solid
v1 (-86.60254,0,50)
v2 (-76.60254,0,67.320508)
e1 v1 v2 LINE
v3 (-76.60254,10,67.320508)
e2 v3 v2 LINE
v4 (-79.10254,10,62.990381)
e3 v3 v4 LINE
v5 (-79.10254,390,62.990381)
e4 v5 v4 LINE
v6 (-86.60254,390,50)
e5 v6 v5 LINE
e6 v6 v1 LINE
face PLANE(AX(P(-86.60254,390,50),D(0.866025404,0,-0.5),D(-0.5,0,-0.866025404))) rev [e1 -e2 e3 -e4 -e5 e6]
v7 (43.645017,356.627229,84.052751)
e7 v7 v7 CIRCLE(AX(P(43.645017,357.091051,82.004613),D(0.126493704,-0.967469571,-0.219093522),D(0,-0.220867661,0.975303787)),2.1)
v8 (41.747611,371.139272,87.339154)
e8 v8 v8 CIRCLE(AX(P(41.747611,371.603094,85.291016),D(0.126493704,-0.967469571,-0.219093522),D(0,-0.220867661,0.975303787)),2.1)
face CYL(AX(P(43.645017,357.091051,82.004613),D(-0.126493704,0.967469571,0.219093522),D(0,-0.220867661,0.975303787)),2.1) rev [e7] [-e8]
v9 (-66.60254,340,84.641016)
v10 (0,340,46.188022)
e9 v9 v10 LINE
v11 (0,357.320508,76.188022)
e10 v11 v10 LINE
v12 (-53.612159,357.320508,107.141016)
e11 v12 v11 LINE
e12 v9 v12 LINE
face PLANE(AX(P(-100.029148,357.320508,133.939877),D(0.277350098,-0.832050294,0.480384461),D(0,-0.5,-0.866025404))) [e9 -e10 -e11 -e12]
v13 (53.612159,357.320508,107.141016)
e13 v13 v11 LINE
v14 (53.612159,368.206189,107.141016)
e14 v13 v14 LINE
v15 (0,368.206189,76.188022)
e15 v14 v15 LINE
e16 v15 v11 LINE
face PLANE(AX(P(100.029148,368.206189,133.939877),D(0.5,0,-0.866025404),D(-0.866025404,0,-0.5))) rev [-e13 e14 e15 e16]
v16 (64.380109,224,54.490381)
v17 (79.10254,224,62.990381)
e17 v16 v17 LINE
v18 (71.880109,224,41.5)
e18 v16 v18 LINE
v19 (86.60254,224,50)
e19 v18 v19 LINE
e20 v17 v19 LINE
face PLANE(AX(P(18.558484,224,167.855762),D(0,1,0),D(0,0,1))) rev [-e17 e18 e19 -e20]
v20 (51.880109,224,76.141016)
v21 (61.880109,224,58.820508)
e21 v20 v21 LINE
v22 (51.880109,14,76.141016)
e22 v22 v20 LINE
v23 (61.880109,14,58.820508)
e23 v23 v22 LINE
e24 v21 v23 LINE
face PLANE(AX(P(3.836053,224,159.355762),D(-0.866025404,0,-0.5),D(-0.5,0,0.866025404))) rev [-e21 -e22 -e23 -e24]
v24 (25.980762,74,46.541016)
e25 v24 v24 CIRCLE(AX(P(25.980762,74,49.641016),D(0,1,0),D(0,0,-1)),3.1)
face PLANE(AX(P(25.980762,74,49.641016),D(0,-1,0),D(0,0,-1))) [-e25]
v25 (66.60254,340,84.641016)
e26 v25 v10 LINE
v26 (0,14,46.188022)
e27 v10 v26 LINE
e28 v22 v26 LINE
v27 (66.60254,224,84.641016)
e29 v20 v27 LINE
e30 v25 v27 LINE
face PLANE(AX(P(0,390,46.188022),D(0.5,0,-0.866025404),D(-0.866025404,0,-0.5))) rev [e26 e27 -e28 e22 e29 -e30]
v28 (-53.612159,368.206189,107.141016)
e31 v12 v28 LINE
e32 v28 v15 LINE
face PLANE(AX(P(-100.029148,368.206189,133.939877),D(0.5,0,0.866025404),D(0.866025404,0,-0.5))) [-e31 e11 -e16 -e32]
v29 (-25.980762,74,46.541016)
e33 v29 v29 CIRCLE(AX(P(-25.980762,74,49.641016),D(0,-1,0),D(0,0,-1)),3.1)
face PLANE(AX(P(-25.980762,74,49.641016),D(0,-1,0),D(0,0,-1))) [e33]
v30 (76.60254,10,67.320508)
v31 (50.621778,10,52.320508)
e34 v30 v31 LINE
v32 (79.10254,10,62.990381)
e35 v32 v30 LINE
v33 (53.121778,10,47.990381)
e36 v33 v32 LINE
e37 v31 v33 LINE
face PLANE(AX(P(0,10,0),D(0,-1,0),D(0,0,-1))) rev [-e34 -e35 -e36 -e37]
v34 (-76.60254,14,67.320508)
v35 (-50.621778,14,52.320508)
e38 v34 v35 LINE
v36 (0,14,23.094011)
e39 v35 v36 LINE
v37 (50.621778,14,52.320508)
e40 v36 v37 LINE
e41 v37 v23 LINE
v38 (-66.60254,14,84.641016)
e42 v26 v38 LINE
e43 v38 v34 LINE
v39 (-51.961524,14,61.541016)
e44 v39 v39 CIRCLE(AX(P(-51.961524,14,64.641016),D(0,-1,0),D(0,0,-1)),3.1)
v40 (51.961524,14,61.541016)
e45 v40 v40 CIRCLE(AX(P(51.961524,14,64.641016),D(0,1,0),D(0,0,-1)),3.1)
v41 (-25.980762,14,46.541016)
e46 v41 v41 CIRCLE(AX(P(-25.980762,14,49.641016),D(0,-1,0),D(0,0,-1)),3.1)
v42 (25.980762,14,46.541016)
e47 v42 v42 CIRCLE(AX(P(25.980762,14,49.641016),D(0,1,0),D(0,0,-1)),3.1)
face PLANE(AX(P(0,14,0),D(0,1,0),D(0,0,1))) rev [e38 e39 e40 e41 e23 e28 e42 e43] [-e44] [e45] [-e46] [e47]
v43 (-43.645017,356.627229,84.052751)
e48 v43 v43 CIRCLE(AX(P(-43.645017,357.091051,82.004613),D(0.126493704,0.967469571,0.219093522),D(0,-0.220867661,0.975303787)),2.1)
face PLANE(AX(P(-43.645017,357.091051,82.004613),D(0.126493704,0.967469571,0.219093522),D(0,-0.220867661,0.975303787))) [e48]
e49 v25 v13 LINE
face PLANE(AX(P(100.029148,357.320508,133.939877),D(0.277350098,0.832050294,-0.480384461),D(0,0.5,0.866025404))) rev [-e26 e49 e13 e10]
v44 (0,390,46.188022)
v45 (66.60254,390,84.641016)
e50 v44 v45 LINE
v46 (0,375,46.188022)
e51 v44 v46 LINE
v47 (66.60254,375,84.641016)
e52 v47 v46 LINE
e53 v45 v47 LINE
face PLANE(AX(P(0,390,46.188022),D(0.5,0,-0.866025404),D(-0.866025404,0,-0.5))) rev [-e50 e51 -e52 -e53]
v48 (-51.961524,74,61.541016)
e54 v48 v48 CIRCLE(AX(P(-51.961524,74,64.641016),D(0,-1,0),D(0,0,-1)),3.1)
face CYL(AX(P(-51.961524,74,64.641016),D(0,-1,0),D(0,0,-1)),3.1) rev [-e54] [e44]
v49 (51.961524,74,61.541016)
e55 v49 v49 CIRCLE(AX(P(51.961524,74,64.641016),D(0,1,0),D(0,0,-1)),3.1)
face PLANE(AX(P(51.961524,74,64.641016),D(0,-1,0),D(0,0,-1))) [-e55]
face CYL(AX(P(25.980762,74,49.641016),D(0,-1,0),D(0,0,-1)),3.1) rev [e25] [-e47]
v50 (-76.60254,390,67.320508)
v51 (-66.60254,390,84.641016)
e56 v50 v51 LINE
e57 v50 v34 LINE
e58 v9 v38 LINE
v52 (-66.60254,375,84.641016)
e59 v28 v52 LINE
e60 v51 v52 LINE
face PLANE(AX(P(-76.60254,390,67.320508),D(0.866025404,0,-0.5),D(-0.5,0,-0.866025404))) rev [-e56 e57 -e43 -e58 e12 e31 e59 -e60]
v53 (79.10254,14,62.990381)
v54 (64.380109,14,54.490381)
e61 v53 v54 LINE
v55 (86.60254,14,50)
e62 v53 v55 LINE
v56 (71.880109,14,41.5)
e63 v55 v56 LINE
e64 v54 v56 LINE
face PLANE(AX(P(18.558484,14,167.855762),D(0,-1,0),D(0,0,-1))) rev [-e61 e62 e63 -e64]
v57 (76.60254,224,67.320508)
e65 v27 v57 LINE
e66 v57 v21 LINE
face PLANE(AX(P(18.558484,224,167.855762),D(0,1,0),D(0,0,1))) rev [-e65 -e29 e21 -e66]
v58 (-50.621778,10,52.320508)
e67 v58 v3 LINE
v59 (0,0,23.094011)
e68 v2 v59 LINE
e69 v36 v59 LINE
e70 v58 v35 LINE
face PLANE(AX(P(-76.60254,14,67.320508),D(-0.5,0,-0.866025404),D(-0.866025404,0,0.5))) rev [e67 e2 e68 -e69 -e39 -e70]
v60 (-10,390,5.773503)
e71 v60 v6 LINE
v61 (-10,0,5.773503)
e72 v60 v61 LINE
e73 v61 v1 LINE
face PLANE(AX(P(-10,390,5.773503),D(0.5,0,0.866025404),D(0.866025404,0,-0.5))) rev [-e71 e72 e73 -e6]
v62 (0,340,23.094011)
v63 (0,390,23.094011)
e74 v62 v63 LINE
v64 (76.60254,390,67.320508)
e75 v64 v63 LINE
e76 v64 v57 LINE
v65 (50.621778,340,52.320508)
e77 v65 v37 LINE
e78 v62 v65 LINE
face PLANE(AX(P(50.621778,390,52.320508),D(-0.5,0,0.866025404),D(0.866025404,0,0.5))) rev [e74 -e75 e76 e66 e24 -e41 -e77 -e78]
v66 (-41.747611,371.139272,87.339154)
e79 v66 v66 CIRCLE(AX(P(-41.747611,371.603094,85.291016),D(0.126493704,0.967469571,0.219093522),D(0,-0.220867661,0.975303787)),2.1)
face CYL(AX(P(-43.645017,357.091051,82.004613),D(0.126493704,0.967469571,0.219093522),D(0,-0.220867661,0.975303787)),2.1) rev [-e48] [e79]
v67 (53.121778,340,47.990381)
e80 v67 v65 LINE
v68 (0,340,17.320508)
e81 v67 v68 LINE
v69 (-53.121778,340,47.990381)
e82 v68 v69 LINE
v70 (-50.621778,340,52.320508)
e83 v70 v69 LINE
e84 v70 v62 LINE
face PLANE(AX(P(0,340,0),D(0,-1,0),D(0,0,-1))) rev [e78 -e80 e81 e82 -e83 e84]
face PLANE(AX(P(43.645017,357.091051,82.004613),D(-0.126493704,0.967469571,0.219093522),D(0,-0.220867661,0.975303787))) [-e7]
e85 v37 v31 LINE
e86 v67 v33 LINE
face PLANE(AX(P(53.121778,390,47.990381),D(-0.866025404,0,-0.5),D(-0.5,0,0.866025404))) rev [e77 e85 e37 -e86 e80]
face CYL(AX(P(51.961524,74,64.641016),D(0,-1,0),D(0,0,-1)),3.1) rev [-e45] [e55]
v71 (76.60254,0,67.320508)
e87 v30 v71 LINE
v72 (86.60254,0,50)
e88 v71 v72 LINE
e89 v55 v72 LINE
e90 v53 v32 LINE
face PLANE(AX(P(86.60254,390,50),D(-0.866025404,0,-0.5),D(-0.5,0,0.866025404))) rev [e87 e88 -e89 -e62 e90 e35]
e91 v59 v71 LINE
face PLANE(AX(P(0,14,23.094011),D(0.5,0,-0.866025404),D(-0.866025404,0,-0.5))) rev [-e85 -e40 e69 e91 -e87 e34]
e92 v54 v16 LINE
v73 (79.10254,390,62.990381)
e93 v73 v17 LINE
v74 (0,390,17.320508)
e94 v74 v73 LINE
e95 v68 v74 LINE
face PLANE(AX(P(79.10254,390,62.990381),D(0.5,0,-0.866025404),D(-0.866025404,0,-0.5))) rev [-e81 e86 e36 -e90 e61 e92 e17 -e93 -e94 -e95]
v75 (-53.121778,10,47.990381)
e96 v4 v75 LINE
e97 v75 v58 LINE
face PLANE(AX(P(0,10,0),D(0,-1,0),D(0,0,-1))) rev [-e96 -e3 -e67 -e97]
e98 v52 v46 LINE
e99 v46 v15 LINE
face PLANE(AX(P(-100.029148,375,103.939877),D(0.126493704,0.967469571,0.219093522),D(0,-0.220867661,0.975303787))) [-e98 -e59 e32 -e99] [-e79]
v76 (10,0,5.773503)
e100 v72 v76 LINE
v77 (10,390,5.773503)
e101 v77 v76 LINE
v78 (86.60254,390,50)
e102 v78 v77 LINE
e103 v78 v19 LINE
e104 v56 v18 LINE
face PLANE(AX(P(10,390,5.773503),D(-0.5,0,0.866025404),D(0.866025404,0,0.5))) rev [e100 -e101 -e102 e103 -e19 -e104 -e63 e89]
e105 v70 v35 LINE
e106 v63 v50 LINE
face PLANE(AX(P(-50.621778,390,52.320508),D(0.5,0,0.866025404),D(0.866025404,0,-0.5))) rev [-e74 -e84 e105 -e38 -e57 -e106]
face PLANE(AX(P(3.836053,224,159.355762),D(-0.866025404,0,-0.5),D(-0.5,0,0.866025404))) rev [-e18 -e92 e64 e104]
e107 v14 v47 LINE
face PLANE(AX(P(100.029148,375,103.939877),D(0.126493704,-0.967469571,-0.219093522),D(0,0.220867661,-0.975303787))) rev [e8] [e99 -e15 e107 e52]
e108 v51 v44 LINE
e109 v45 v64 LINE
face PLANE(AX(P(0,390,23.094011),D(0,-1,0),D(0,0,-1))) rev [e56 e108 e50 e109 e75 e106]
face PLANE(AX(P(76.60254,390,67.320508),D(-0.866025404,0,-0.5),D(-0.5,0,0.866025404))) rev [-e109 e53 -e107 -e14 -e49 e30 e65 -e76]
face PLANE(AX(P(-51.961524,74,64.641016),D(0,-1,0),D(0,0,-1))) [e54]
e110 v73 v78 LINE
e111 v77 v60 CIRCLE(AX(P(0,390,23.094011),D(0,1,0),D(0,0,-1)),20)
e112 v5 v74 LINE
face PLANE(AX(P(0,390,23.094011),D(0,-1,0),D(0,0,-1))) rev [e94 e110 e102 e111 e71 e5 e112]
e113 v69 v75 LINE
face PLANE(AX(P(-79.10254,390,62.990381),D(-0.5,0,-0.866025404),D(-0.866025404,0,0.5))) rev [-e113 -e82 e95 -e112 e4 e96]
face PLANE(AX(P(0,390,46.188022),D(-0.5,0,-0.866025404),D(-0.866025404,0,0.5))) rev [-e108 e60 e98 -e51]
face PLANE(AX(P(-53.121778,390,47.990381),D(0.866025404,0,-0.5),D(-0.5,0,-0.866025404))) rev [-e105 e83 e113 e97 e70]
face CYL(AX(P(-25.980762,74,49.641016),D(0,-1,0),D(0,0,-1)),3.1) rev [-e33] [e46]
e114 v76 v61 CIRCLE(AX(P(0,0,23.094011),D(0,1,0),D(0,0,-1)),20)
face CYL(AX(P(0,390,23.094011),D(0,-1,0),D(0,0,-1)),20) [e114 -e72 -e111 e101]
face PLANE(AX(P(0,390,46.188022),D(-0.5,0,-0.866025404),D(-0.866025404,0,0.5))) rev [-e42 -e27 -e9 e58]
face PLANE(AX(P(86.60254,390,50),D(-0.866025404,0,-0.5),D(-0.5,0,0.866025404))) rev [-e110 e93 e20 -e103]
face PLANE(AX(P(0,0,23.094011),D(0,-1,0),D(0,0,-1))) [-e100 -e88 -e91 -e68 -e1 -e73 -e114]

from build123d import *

# Parameters (mm, degrees)
BOSS_EXTRUDE1_DEPTH = 390
CUT_EXTRUDE2_DEPTH  = 14
CUT_EXTRUDE3_DEPTH  = 50
BOSS_EXTRUDE2_DEPTH = 10
BOSS_EXTRUDE3_REACH = 473.852
BOSS_EXTRUDE4_REACH = 479.913
SKETCH22_R          = 2.1
CUT_EXTRUDE4_DEPTH  = 15
SKETCH23_R          = 3.1
CUT_EXTRUDE5_DEPTH  = 60
SKETCH24_W          = 17
SKETCH24_H          = 210
CUT_EXTRUDE6_DEPTH  = 414.617211129


with BuildPart() as part:
    # Sketch1 → Boss-Extrude1 (new body)
    with BuildSketch(Plane(origin=(0, 0, 0), x_dir=(1, 0, 0), z_dir=(0, 1, 0))):
        with BuildLine():
            Line((-10, -5.773502692), (-86.602540378, -50))
            Line((-86.602540378, -50), (-79.102540378, -62.990381057))
            Line((-79.102540378, -62.990381057), (-53.121778265, -47.990381057))
            Line((-53.121778265, -47.990381057), (-50.621778265, -52.320508076))
            Line((-50.621778265, -52.320508076), (-76.602540378, -67.320508076))
            Line((-76.602540378, -67.320508076), (-66.602540378, -84.641016151))
            Line((-66.602540378, -84.641016151), (0, -46.188021535))
            Line((0, -46.188021535), (66.602540378, -84.641016151))
            Line((66.602540378, -84.641016151), (76.602540378, -67.320508076))
            Line((76.602540378, -67.320508076), (50.621778265, -52.320508076))
            Line((50.621778265, -52.320508076), (53.121778265, -47.990381057))
            Line((53.121778265, -47.990381057), (79.102540378, -62.990381057))
            Line((79.102540378, -62.990381057), (86.602540378, -50))
            Line((86.602540378, -50), (10, -5.773502692))
            ThreePointArc((10, -5.773502692), (0, -3.094010768), (-10, -5.773502692))
        make_face()
    extrude(amount=BOSS_EXTRUDE1_DEPTH)

    # Sketch18 → Cut-Extrude2 (cut)
    with BuildSketch(Plane.XZ):
        Polygon((-76.602540378, 67.320508076), (0, 23.094010768), (76.602540378, 67.320508076), (66.602540378, 84.641016151), (0, 46.188021535), (-66.602540378, 84.641016151), align=None)
    extrude(amount=-CUT_EXTRUDE2_DEPTH, mode=Mode.SUBTRACT)

    # Sketch19 → Cut-Extrude3 (cut)
    with BuildSketch(Plane(origin=(0, 390, 0), x_dir=(1, 0, 0), z_dir=(0, 1, 0))):
        Polygon((76.602540378, -67.320508076), (0, -23.094010768), (-76.602540378, -67.320508076), (-79.102540378, -62.990381057), (0, -17.320508076), (79.102540378, -62.990381057), align=None)
    extrude(amount=-CUT_EXTRUDE3_DEPTH, mode=Mode.SUBTRACT)

    # Sketch20 → Boss-Extrude2 (add)
    with BuildSketch(Plane.XZ):
        Polygon((76.602540378, 67.320508076), (50.621778265, 52.320508076), (53.121778265, 47.990381057), (79.102540378, 62.990381057), align=None)
        Polygon((-50.621778265, 52.320508076), (-76.602540378, 67.320508076), (-79.102540378, 62.990381057), (-53.121778265, 47.990381057), align=None)
    extrude(amount=-BOSS_EXTRUDE2_DEPTH)

    # Boss-Extrude3: up to this plane
    boss_extrude3_end = Plane(origin=(-86.602540378, 390, 50), z_dir=(0.8660254037844359, 0, -0.5000000000000048))
    # Sketch21 → Boss-Extrude3 (add, up to the surface)
    with BuildSketch(Plane(origin=(0, 0, 0), x_dir=(0, 0, -1), z_dir=(1, 0, 0)), mode=Mode.PRIVATE) as boss_extrude3_sk1:
        Polygon((-46.188021535, 375), (-76.188021535, 368.206188758), (-76.188021535, 357.320508076), (-46.188021535, 340), align=None)
    boss_extrude3_tool1 = split(extrude(boss_extrude3_sk1.sketch, amount=BOSS_EXTRUDE3_REACH, dir=(-0.866025403784, 0, 0.5), mode=Mode.PRIVATE), bisect_by=boss_extrude3_end, keep=Keep.BOTH, mode=Mode.PRIVATE)
    add(boss_extrude3_tool1.solids().sort_by_distance((0, 359.670666, 58.56037))[0])

    # Boss-Extrude4: up to this plane
    boss_extrude4_end = Plane(origin=(76.602540378, 390, 67.320508076), z_dir=(-0.8660254037844398, 0, -0.49999999999999795))
    # Sketch21<2> → Boss-Extrude4 (add, up to the surface)
    with BuildSketch(Plane(origin=(0, 0, 0), x_dir=(0, 0, -1), z_dir=(1, 0, 0)), mode=Mode.PRIVATE) as boss_extrude4_sk1:
        Polygon((-46.188021535, 375), (-76.188021535, 368.206188758), (-76.188021535, 357.320508076), (-46.188021535, 340), align=None)
    boss_extrude4_tool1 = split(extrude(boss_extrude4_sk1.sketch, amount=BOSS_EXTRUDE4_REACH, dir=(0.866025403784, 0, 0.5), mode=Mode.PRIVATE), bisect_by=boss_extrude4_end, keep=Keep.BOTH, mode=Mode.PRIVATE)
    add(boss_extrude4_tool1.solids().sort_by_distance((0, 359.670666, 58.56037))[0])

    # Sketch22 → Cut-Extrude4 (cut)
    with BuildSketch(Plane(origin=(47.172106066, 360.789319124, 81.704484407), x_dir=(0.9919674102096397, -0.12336978823439819, -0.027938368473838713), z_dir=(0.12649370372465277, 0.9674695714450555, 0.21909352168866236))):
        with Locations((-89.639756751, -1.109544744)):
            Circle(SKETCH22_R)
    cut_extrude4 = extrude(amount=-CUT_EXTRUDE4_DEPTH, mode=Mode.SUBTRACT)

    # Mirror1: Cut-Extrude4 across plane
    add(cut_extrude4.mirror(Plane(origin=(0, 0, 0), x_dir=(0, 0, 1), z_dir=(1, 0, 0))), mode=Mode.SUBTRACT)

    # Sketch23 → Cut-Extrude5 (cut)
    with BuildSketch(Plane.XZ.offset(-14)):
        with Locations((-25.980762114, 49.641016151)):
            Circle(SKETCH23_R)
        with Locations((-51.961524227, 64.641016151)):
            Circle(SKETCH23_R)
    cut_extrude5 = extrude(amount=-CUT_EXTRUDE5_DEPTH, mode=Mode.SUBTRACT)

    # Mirror2: Cut-Extrude5 across plane
    add(cut_extrude5.mirror(Plane(origin=(0, 0, 0), x_dir=(0, 0, 1), z_dir=(1, 0, 0))), mode=Mode.SUBTRACT)

    # Sketch24 → Cut-Extrude6 (cut, through all)
    with BuildSketch(Plane(origin=(0, 0, 0), x_dir=(-0.8660254037844417, 0, -0.4999999999999947), z_dir=(0.4999999999999947, 0, -0.8660254037844417))):
        with Locations((-91.5, 119)):
            Rectangle(SKETCH24_W, SKETCH24_H)
    extrude(amount=-CUT_EXTRUDE6_DEPTH, mode=Mode.SUBTRACT)


solid = part.part
